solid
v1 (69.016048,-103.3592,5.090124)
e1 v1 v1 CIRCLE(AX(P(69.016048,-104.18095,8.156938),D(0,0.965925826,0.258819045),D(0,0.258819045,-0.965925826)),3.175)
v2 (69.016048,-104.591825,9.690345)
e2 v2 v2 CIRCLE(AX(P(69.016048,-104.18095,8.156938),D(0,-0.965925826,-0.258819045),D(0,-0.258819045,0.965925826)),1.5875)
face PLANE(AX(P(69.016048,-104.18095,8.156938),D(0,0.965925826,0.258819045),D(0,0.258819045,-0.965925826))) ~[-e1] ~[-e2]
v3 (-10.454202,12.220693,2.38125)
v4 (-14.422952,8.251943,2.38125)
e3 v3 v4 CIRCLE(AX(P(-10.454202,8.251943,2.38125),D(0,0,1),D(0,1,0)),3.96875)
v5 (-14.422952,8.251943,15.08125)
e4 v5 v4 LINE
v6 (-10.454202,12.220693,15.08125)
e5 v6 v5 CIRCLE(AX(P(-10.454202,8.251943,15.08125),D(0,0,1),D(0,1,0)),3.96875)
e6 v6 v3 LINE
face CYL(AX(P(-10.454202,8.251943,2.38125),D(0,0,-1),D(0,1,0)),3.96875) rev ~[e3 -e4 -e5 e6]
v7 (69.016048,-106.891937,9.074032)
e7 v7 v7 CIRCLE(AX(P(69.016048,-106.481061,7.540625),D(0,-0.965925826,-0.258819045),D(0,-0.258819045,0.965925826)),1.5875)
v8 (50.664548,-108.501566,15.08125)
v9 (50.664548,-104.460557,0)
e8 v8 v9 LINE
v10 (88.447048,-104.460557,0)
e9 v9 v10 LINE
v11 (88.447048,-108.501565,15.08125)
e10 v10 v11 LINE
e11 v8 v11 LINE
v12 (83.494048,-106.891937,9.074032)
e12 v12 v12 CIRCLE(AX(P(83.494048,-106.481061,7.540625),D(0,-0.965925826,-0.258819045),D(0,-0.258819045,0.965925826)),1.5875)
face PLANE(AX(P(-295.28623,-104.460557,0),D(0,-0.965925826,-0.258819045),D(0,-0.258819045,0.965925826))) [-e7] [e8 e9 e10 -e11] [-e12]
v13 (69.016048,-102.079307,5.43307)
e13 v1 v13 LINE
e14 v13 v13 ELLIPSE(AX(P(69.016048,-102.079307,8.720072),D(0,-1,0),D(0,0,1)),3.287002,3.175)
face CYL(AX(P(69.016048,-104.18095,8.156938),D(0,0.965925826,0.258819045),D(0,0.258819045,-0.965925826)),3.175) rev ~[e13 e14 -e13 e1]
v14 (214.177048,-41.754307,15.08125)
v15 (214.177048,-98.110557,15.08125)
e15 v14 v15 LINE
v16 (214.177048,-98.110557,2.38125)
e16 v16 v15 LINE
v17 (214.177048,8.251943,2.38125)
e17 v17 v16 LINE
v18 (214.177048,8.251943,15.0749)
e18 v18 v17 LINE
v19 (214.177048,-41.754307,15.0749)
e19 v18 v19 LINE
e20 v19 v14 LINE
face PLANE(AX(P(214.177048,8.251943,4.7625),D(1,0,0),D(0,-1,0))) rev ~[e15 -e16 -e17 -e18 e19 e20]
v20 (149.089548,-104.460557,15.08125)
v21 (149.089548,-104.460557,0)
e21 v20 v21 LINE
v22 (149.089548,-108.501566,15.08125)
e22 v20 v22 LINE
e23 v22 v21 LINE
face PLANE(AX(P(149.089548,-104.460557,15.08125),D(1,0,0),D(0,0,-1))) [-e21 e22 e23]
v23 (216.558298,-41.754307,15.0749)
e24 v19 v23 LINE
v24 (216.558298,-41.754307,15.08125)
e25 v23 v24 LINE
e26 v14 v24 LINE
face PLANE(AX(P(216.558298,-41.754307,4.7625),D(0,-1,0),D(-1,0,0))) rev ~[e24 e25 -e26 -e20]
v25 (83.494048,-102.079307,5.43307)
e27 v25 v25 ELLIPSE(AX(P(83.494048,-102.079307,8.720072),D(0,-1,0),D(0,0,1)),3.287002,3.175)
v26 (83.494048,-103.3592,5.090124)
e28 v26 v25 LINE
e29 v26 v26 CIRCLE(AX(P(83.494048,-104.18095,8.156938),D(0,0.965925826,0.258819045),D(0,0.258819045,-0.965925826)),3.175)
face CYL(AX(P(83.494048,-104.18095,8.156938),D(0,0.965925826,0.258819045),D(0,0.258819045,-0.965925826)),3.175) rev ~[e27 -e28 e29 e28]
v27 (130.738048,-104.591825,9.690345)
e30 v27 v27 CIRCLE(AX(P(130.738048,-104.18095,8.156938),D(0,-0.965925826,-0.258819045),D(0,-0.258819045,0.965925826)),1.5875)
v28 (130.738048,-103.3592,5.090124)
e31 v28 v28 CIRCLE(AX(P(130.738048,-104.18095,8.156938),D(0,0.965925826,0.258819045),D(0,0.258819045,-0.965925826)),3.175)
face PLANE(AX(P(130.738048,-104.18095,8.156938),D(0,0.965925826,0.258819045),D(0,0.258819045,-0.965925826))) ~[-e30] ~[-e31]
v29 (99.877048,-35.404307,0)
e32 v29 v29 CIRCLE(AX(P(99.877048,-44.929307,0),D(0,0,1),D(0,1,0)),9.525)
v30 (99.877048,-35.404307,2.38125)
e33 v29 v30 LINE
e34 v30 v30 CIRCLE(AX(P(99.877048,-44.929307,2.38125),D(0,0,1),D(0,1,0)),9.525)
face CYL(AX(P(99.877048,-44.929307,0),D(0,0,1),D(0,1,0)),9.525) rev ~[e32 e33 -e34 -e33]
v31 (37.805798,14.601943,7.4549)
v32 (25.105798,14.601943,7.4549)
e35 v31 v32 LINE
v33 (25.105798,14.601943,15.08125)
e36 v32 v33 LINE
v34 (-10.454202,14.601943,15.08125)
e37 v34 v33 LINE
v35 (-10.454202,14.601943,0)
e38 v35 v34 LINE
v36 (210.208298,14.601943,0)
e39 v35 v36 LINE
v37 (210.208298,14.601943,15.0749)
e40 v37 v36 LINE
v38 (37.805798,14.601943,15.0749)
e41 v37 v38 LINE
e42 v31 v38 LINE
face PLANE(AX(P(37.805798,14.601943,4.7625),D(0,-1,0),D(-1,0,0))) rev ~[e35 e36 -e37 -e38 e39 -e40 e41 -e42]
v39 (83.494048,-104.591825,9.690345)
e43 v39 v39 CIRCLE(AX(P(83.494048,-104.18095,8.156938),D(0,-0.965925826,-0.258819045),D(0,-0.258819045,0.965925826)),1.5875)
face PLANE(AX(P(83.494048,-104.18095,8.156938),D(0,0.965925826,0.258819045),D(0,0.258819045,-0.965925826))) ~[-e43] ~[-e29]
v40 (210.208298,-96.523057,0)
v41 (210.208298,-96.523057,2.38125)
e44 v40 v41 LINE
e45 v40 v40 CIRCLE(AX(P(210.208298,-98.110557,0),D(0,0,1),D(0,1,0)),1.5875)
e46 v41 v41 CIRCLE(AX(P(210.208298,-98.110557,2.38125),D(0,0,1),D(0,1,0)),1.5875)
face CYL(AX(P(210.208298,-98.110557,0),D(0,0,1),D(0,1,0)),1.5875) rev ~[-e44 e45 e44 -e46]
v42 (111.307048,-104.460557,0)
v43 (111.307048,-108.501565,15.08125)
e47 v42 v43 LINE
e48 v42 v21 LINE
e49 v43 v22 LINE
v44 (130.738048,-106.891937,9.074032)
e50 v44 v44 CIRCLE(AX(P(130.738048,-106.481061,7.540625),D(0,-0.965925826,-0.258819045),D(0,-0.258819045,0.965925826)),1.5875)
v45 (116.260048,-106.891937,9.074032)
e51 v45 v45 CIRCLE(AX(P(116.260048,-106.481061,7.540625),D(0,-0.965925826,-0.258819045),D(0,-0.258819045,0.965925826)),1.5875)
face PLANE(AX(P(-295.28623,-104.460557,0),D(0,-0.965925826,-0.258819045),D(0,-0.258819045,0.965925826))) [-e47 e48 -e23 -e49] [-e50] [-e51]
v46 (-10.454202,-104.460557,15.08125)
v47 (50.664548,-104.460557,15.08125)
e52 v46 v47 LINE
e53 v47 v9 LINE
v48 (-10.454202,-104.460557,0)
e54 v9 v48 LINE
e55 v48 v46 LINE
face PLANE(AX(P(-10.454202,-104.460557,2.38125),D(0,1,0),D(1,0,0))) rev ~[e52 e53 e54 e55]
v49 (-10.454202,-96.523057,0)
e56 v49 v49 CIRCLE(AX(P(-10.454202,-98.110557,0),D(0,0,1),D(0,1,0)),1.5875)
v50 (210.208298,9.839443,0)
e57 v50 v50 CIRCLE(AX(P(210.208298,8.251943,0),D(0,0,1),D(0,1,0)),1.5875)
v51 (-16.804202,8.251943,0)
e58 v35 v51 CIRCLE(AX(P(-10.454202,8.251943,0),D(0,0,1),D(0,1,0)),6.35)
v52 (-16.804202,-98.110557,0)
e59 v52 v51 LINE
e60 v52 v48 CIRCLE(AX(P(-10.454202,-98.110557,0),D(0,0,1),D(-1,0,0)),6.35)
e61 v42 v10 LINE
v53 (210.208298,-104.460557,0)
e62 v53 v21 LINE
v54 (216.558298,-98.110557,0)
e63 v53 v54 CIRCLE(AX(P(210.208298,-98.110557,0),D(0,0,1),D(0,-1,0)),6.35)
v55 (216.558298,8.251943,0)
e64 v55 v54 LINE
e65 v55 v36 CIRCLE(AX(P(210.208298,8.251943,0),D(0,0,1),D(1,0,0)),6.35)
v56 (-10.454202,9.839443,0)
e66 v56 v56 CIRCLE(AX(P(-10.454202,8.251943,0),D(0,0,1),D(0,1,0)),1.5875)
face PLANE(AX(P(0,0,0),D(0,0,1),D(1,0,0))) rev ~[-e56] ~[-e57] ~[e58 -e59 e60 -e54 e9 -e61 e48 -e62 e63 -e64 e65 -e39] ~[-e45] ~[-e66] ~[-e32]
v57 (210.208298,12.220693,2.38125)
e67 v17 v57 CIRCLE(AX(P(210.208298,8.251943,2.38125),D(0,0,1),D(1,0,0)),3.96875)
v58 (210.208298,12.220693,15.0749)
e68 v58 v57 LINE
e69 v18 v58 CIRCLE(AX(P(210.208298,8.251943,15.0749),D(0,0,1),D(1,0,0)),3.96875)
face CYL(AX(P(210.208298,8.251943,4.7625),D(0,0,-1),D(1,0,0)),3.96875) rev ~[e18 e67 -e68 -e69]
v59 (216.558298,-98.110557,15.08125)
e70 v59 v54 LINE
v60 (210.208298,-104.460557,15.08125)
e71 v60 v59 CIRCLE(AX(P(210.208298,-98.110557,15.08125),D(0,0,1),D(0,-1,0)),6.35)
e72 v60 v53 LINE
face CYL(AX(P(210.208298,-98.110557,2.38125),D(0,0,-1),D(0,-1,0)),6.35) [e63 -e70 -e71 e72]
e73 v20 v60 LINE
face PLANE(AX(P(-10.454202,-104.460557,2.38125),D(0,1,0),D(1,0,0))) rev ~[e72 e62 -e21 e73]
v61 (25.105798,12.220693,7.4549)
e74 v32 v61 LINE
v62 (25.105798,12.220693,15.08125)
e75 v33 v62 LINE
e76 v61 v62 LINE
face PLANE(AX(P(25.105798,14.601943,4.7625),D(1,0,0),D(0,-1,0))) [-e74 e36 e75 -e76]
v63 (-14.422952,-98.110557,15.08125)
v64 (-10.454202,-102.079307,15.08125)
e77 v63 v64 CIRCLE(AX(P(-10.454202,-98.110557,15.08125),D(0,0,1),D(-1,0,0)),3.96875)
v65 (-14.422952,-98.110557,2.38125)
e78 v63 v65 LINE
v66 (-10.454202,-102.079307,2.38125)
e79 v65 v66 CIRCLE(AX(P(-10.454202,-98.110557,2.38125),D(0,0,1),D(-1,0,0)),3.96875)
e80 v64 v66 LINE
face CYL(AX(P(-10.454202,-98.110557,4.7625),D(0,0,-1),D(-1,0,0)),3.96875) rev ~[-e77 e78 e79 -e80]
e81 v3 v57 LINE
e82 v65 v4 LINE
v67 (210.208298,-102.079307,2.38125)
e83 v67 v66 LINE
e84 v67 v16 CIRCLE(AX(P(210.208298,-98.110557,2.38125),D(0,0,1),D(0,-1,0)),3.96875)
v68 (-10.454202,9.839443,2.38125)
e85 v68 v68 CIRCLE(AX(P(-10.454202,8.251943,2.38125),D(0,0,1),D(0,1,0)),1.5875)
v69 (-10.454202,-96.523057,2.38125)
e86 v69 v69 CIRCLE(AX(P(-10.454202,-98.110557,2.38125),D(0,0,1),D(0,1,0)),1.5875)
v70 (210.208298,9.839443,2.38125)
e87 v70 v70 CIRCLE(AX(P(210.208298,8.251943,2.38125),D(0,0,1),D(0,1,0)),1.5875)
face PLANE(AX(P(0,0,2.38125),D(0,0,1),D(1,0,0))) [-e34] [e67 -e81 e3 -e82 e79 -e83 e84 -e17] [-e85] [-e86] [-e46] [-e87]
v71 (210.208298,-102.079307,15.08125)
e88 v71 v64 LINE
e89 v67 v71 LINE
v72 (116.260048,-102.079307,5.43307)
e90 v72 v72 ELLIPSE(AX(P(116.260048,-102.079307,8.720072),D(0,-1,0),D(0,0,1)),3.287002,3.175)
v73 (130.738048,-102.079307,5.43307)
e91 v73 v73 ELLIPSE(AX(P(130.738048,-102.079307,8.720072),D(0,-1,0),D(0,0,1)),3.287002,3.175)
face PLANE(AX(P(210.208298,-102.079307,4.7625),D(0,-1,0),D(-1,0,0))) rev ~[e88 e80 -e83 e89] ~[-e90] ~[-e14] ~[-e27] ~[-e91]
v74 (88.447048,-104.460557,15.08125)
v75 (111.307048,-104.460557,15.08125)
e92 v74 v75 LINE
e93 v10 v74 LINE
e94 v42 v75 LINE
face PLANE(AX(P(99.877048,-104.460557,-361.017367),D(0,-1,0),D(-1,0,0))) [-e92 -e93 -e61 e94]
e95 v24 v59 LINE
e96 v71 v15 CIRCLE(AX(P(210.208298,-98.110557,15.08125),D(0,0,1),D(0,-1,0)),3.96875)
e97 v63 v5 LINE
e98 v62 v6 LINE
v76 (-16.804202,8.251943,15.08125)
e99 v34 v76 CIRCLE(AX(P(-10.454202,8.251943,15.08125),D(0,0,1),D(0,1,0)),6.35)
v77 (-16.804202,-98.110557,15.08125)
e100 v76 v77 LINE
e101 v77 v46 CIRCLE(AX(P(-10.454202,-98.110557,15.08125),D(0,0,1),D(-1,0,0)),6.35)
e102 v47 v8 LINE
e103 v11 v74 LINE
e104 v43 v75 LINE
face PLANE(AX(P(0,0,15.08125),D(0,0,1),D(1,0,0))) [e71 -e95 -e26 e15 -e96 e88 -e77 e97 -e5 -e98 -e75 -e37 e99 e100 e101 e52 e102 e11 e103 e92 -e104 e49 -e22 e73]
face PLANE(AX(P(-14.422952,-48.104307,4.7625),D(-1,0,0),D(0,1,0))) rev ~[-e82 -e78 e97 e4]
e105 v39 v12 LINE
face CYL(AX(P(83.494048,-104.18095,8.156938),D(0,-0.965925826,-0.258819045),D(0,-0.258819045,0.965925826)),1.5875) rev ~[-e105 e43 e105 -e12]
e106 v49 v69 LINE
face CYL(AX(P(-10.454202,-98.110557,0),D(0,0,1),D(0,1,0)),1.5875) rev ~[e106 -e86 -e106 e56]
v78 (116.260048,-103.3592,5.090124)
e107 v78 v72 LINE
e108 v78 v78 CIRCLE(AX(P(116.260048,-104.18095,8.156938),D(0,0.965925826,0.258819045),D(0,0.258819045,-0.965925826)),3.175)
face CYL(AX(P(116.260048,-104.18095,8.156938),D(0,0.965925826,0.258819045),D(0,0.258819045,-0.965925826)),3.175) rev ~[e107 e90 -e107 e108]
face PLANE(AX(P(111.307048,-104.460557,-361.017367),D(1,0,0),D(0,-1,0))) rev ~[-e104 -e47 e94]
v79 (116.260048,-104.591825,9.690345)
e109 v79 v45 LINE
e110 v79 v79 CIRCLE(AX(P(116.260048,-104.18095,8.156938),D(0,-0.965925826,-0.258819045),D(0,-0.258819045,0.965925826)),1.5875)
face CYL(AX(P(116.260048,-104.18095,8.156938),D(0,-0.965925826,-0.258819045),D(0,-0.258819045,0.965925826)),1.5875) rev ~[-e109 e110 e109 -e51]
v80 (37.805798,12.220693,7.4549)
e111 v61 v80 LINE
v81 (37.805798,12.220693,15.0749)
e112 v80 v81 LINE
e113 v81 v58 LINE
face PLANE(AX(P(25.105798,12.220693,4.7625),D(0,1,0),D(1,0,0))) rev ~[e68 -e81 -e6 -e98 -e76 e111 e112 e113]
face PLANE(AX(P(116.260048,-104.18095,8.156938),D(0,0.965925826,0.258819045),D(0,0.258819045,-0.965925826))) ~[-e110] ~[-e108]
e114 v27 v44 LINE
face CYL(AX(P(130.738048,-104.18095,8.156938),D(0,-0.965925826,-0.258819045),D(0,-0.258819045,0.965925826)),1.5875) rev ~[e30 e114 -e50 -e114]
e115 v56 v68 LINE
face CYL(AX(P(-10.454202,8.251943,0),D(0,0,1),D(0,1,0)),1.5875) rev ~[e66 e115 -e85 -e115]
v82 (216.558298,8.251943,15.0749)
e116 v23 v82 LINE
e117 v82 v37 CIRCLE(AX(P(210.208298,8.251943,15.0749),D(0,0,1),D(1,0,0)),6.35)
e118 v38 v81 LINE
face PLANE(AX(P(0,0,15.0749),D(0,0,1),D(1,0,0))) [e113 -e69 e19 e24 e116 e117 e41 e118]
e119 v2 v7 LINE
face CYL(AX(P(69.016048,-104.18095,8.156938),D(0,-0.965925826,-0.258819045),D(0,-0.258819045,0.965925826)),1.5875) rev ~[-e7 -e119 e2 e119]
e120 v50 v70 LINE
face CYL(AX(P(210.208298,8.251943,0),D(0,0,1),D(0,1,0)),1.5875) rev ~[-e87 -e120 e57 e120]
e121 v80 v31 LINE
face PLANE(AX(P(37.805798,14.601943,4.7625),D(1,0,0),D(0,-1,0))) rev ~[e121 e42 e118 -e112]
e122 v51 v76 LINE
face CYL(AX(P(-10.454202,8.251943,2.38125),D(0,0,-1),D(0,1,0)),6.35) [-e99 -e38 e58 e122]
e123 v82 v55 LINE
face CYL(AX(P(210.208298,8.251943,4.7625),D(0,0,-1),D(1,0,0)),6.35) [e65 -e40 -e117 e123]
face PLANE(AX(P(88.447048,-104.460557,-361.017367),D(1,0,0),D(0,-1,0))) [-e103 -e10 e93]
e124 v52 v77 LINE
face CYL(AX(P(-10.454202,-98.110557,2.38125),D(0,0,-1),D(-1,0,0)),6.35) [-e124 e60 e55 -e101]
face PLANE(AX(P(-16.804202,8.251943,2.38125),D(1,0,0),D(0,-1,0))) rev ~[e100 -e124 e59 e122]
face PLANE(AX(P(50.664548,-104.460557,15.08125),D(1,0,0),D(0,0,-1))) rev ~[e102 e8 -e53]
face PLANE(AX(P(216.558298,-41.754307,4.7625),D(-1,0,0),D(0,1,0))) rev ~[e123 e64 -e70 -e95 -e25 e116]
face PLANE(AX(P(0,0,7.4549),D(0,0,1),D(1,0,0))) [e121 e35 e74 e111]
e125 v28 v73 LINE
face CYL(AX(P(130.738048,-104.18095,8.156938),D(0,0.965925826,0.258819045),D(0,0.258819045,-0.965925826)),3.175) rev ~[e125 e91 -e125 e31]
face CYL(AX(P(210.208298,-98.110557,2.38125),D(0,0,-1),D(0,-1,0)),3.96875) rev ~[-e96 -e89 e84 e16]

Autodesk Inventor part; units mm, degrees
ref_plane "YZ Plane" through (0, 0, 0) normal (1, 0, 0) x (0, 1, 0)
ref_plane "XZ Plane" through (0, 0, 0) normal (0, 1, 0) x (-1, 0, 0)
sketch "Sketch1" plane through (0, 0, 0) normal (0, 0, 1) x (1, 0, 0)
  line L0 (-10.454202, 14.601943) -> (210.208298, 14.601943)
  line L1 (216.558298, 8.251943) -> (216.558298, -98.110557)
  line L2 (210.208298, -104.460557) -> (-10.454202, -104.460557)
  line L3 (-16.804202, -98.110557) -> (-16.804202, 8.251943)
  line L4 (99.877048, 12.220693) -> (-10.454202, 12.220693)
  line L5 (-14.422952, 8.251943) -> (-14.422952, -44.929307)
  line L6 (99.877048, 12.220693) -> (210.208298, 12.220693)
  line L7 (214.177048, 8.251943) -> (214.177048, -44.929307)
  line L8 (99.877048, -102.079307) -> (210.208298, -102.079307)
  line L9 (214.177048, -98.110557) -> (214.177048, -44.929307)
  line L10 (99.877048, -102.079307) -> (-10.454202, -102.079307)
  line L11 (-14.422952, -98.110557) -> (-14.422952, -44.929307)
  arc A0 (-10.454202, 14.601943) -> (-16.804202, 8.251943) centre (-10.454202, 8.251943) ccw
  arc A1 (216.558298, 8.251943) -> (210.208298, 14.601943) centre (210.208298, 8.251943) ccw
  arc A2 (210.208298, -104.460557) -> (216.558298, -98.110557) centre (210.208298, -98.110557) ccw
  arc A3 (-16.804202, -98.110557) -> (-10.454202, -104.460557) centre (-10.454202, -98.110557) ccw
  arc A4 (-10.454202, 12.220693) -> (-14.422952, 8.251943) centre (-10.454202, 8.251943) ccw
  arc A5 (214.177048, 8.251943) -> (210.208298, 12.220693) centre (210.208298, 8.251943) ccw
  arc A6 (210.208298, -102.079307) -> (214.177048, -98.110557) centre (210.208298, -98.110557) ccw
  arc A7 (-14.422952, -98.110557) -> (-10.454202, -102.079307) centre (-10.454202, -98.110557) ccw
  point P0 (0, 0)
  point P1 (-16.804202, 14.601943)
  point P2 (216.558298, -104.460557)
  point P3 (216.558298, 14.601943)
  point P4 (-16.804202, -104.460557)
  dimension "d0" = 233.3625
  dimension "d1" = 119.0625
  dimension "d9" = 6.35
  dimension "d10" = 3.96875
extrude "Extrusion1" add sketch "Sketch1" along normal blind 2.38125 contours L0 A1 L1 A2 L2 A3 L3 A0 | L6 A5 L7 L9 A6 L8 L10 A7 L11 L5 A4 L4
sketch "Sketch2" plane through (0, 0, 2.38125) normal (0, 0, 1) x (1, 0, 0)
  line L0 (210.208298, 14.601943) -> (-10.454202, 14.601943)
  arc A0 (-10.454202, 14.601943) -> (-16.804202, 8.251943) centre (-10.454202, 8.251943) ccw
  line L1 (-16.804202, 8.251943) -> (-16.804202, -98.110557)
  arc A1 (-16.804202, -98.110557) -> (-10.454202, -104.460557) centre (-10.454202, -98.110557) ccw
  line L2 (-10.454202, -104.460557) -> (210.208298, -104.460557)
  arc A2 (210.208298, -104.460557) -> (216.558298, -98.110557) centre (210.208298, -98.110557) ccw
  line L3 (216.558298, -98.110557) -> (216.558298, 8.251943)
  arc A3 (216.558298, 8.251943) -> (210.208298, 14.601943) centre (210.208298, 8.251943) ccw
  line L4 (99.877048, 12.220693) -> (-10.454202, 12.220693)
  line L5 (-14.422952, 8.251943) -> (-14.422952, -44.929307)
  line L6 (99.877048, -102.079307) -> (-10.454202, -102.079307)
  line L7 (-14.422952, -98.110557) -> (-14.422952, -44.929307)
  line L8 (99.877048, -102.079307) -> (210.208298, -102.079307)
  line L9 (214.177048, -98.110557) -> (214.177048, -44.929307)
  line L10 (99.877048, 12.220693) -> (210.208298, 12.220693)
  line L11 (214.177048, 8.251943) -> (214.177048, -44.929307)
  arc A4 (-10.454202, 12.220693) -> (-14.422952, 8.251943) centre (-10.454202, 8.251943) ccw
  arc A5 (214.177048, 8.251943) -> (210.208298, 12.220693) centre (210.208298, 8.251943) ccw
  arc A6 (210.208298, -102.079307) -> (214.177048, -98.110557) centre (210.208298, -98.110557) ccw
  arc A7 (-14.422952, -98.110557) -> (-10.454202, -102.079307) centre (-10.454202, -98.110557) ccw
  point P0 (0, 0)
  dimension "d15" = 3.96875
extrude "Extrusion2" add sketch "Sketch2" along normal blind 2.38125
sketch "Sketch3" plane through (0, 0, 4.7625) normal (0, 0, 1) x (1, 0, 0)
  arc A0 (-10.454202, 12.220693) -> (-14.422952, 8.251943) centre (-10.454202, 8.251943) ccw
  arc A1 (214.177048, 8.251943) -> (210.208298, 12.220693) centre (210.208298, 8.251943) ccw
  line L0 (214.177048, 8.251943) -> (214.177048, -98.110557)
  arc A2 (210.208298, -102.079307) -> (214.177048, -98.110557) centre (210.208298, -98.110557) ccw
  line L1 (210.208298, -102.079307) -> (-10.454202, -102.079307)
  arc A3 (-14.422952, -98.110557) -> (-10.454202, -102.079307) centre (-10.454202, -98.110557) ccw
  line L2 (-14.422952, -98.110557) -> (-14.422952, 8.251943)
  arc A4 (-10.454202, 14.601943) -> (-16.804202, 8.251943) centre (-10.454202, 8.251943) ccw
  line L3 (-16.804202, 8.251943) -> (-16.804202, -98.110557)
  arc A5 (-16.804202, -98.110557) -> (-10.454202, -104.460557) centre (-10.454202, -98.110557) ccw
  line L4 (-10.454202, -104.460557) -> (210.208298, -104.460557)
  arc A6 (210.208298, -104.460557) -> (216.558298, -98.110557) centre (210.208298, -98.110557) ccw
  line L5 (216.558298, -98.110557) -> (216.558298, 8.251943)
  arc A7 (216.558298, 8.251943) -> (210.208298, 14.601943) centre (210.208298, 8.251943) ccw
  line L6 (214.177048, -44.929307) -> (214.177048, -41.754307)
  line L7 (214.177048, -41.754307) -> (216.558298, -41.754307)
  line L8 (216.558298, -41.754307) -> (216.558298, -44.929307)
  line L9 (216.558298, -44.929307) -> (216.558298, -48.104307)
  line L10 (216.558298, -48.104307) -> (214.177048, -48.104307)
  line L11 (214.177048, -48.104307) -> (214.177048, -44.929307)
  line L12 (-14.422952, -44.929307) -> (-14.422952, -41.754307)
  line L13 (-14.422952, -41.754307) -> (-16.804202, -41.754307)
  line L14 (-16.804202, -41.754307) -> (-16.804202, -44.929307)
  line L15 (-16.804202, -44.929307) -> (-16.804202, -48.104307)
  line L16 (-16.804202, -48.104307) -> (-14.422952, -48.104307)
  line L17 (-14.422952, -48.104307) -> (-14.422952, -44.929307)
  line L18 (25.105798, 14.601943) -> (25.105798, 12.220693)
  line L19 (37.805798, 14.601943) -> (37.805798, 12.220693)
  line L20 (-10.454202, 14.601943) -> (25.105798, 14.601943)
  line L21 (25.105798, 12.220693) -> (-10.454202, 12.220693)
  line L22 (37.805798, 12.220693) -> (210.208298, 12.220693)
  line L23 (210.208298, 14.601943) -> (37.805798, 14.601943)
  point P0 (0, 0)
  dimension "d18" = 3.175
  dimension "d19" = 3.175
  dimension "d20" = 3.175
  dimension "d21" = 3.175
  dimension "d78" = 35.56
  dimension "d79" = 12.7
extrude "Extrusion3" add sketch "Sketch3" along normal blind 10.31875 contours A0 L2 L13 L3 A4 L20 L18 L21 | L2 A3 L1 A2 L0 L10 L5 A6 L4 A5 L3 L16
sketch "Sketch4" plane through (0, 0, 15.08125) normal (0, 0, 1) x (1, 0, 0)
  line L0 (214.177048, -41.754307) -> (216.558298, -41.754307)
  line L1 (216.558298, -41.754307) -> (216.558298, -48.104307)
  line L2 (216.558298, -48.104307) -> (214.177048, -48.104307)
  line L3 (214.177048, -48.104307) -> (214.177048, -41.754307)
  line L4 (-16.804202, -41.754307) -> (-14.422952, -41.754307)
  line L5 (-14.422952, -41.754307) -> (-14.422952, -48.104307)
  line L6 (-14.422952, -48.104307) -> (-16.804202, -48.104307)
  line L7 (-16.804202, -48.104307) -> (-16.804202, -41.754307)
  point P0 (0, 0)
  dimension "d24" = 2.38125
  dimension "d25" = 6.35
  dimension "d26" = 2.38125
  dimension "d27" = 6.35
extrude "Extrusion4" add sketch "Sketch4" against normal blind 7.9375
sketch "Sketch5" plane through (0, 0, 0) normal (0, 0, -1) x (-1, 0, 0)
  arc A0 (-210.208298, 14.601943) -> (-216.558298, 8.251943) centre (-210.208298, 8.251943) ccw
  line L0 (-210.208298, 8.251943) -> (-99.877048, 8.251943)
  line L1 (-99.877048, 8.251943) -> (-99.877048, -44.929307)
  line L2 (-99.877048, -44.929307) -> (-210.208298, -44.929307)
  line L3 (-210.208298, -44.929307) -> (-210.208298, 8.251943)
  point P0 (0, 0)
hole "Hole1" at (99.877048, -44.929307, 0) direction (0, 0, 1) diameter 19.05 end through all
sketch "Sketch7" plane through (-10.454202, -104.460557, 0) normal (0, -1, 0) x (1, 0, 0)
  line L0 (220.6625, 0) -> (0, 0)
  line L1 (0, 15.08125) -> (220.6625, 15.08125)
  line L2 (61.11875, 15.08125) -> (61.11875, 0)
  line L3 (159.54375, 15.08125) -> (159.54375, 0)
  line L4 (61.11875, 15.08125) -> (159.54375, 15.08125)
  line L5 (159.54375, 0) -> (61.11875, 0)
  point P0 (10.454202, 0)
extrude "Extrusion5" add sketch "Sketch7" along normal blind 25.4
sketch "Sketch8" plane through (149.089548, -104.460557, 15.08125) normal (1, 0, 0) x (0, 0, -1)
  line L0 (15.08125, 0) -> (-19.502452, -9.266675)
  line L1 (15.08125, 0) -> (50.884933, 0) construction
  point P0 (15.08125, 104.460557)
  dimension "d41" = 165
split body "Split1" sketch "Sketch8" result one side removed curves L0 removed pieces at (116.281215, -121.39389, 0.5)
ref_plane "Work Plane1" through (50.664548, -102.160446, 0.616313) normal (0, -0.9659258, -0.258819) x (1, 0, 0)
sketch "Sketch10" plane through (0, 0, 15.08125) normal (0, 0, 1) x (1, 0, 0)
  line L0 (99.877048, -104.460557) -> (111.307048, -104.460557)
  line L1 (111.307048, -104.460557) -> (111.307048, -108.501565)
  line L2 (99.877048, -104.460557) -> (88.447048, -104.460557)
  line L3 (88.447048, -104.460557) -> (88.447048, -108.501565)
  line L4 (88.447048, -108.501565) -> (111.307048, -108.501565)
  point P0 (0, 0)
  dimension "d43" = 11.43
  dimension "d44" = 11.43
split body "Split2" sketch "Sketch10" result one side removed curves L4 L1 L0 L2 L3 removed pieces at (99.877048, -106.671599, 10.183576)
sketch "Sketch13" plane through (50.664548, -102.160446, 0.616313) normal (0, -0.9659258, -0.258819) x (1, 0, 0)
  line L0 (37.7825, 0) -> (37.7825, 15.613259)
  line L1 (0, 15.613259) -> (37.7825, 15.613259)
  line L2 (0, 0) -> (0, 15.613259)
  line L3 (37.7825, 0) -> (0, 0)
  line L4 (60.6425, 15.613259) -> (60.6425, 0)
  line L5 (98.425, 0) -> (60.6425, 0)
  line L6 (98.425, 15.613259) -> (98.425, 0)
  line L7 (60.6425, 15.613259) -> (98.425, 15.613259)
  line L8 (0, 15.613259) -> (98.425, 15.613259)
  line L9 (49.2125, 15.613259) -> (49.2125, 0)
  line L10 (49.2125, 7.806629) -> (32.8295, 7.806629)
  line L11 (49.2125, 7.806629) -> (65.5955, 7.806629)
  line L12 (65.5955, 7.806629) -> (80.0735, 7.806629)
  line L13 (32.8295, 7.806629) -> (18.3515, 7.806629)
  point P0 (-50.664548, -27.036381)
  dimension "d45" = 16.383
  dimension "d46" = 16.383
  dimension "d47" = 14.478
  dimension "d48" = 14.478
hole "Hole2" at (69.016048, -104.18095, 8.156938) at (116.260048, -104.18095, 8.156938) at (83.494048, -104.18095, 8.156938) at (130.738048, -104.18095, 8.156938) direction (0, 0.9659258, 0.258819) diameter 6.35 end through all
sketch "Sketch14" plane through (50.664548, -102.160446, 0.616313) normal (0, -0.9659258, -0.258819) x (1, 0, 0)
  line L0 (37.7825, 0) -> (37.7825, 15.613259)
  line L1 (0, 15.613259) -> (37.7825, 15.613259)
  line L2 (0, 0) -> (0, 15.613259)
  line L3 (37.7825, 0) -> (0, 0)
  line L4 (60.6425, 15.613259) -> (60.6425, 0)
  line L5 (98.425, 0) -> (60.6425, 0)
  line L6 (98.425, 15.613259) -> (98.425, 0)
  line L7 (60.6425, 15.613259) -> (98.425, 15.613259)
  line L8 (0, 15.613259) -> (98.425, 15.613259)
  line L9 (49.2125, 15.613259) -> (49.2125, 0)
  line L10 (49.2125, 7.806629) -> (65.5955, 7.806629)
  line L11 (65.5955, 7.806629) -> (80.0735, 7.806629)
  line L12 (49.2125, 7.806629) -> (32.8295, 7.806629)
  line L13 (32.8295, 7.806629) -> (18.3515, 7.806629)
  point P0 (-50.664548, -27.036381)
  dimension "d56" = 16.383
  dimension "d57" = 14.478
  dimension "d58" = 16.383
  dimension "d59" = 14.478
hole "Hole3" at (69.016048, -104.18095, 8.156938) at (83.494048, -104.18095, 8.156938) at (116.260048, -104.18095, 8.156938) at (130.738048, -104.18095, 8.156938) direction (0, -0.9659258, -0.258819) diameter 3.175 end through all
sketch "Sketch15" plane through (0, 0, 4.7625) normal (0, 0, 1) x (1, 0, 0)
  line L0 (216.558298, -41.754307) -> (214.177048, -41.754307)
  line L1 (214.177048, 8.251943) -> (214.177048, -48.104307)
  line L2 (216.558298, -41.754307) -> (214.177048, -41.754307)
  line L3 (214.177048, -41.754307) -> (214.177048, -48.104307)
  line L4 (214.177048, -48.104307) -> (216.558298, -48.104307)
  line L5 (216.558298, -48.104307) -> (216.558298, -41.754307)
  point P0 (0, 0)
extrude "Extrusion6" add sketch "Sketch15" along normal blind 2.3876
sketch "Sketch16" plane through (0, 0, 4.7625) normal (0, 0, 1) x (1, 0, 0)
  line L0 (-14.422952, -41.754307) -> (-16.804202, -41.754307)
  line L1 (-16.804202, -41.754307) -> (-16.804202, -48.104307)
  line L2 (-14.422952, -41.754307) -> (-16.804202, -41.754307)
  line L3 (-16.804202, -41.754307) -> (-16.804202, -48.104307)
  line L4 (-16.804202, -48.104307) -> (-14.422952, -48.104307)
  line L5 (-14.422952, -48.104307) -> (-14.422952, -41.754307)
  point P0 (0, 0)
extrude "Extrusion7" add sketch "Sketch16" along normal blind 2.3876
sketch "Sketch17" plane through (0, 0, 0) normal (0, 0, -1) x (-1, 0, 0)
  arc A0 (10.454202, -104.460557) -> (16.804202, -98.110557) centre (10.454202, -98.110557) ccw
  arc A1 (16.804202, 8.251943) -> (10.454202, 14.601943) centre (10.454202, 8.251943) ccw
  arc A2 (-210.208298, 14.601943) -> (-216.558298, 8.251943) centre (-210.208298, 8.251943) ccw
  arc A3 (-216.558298, -98.110557) -> (-210.208298, -104.460557) centre (-210.208298, -98.110557) ccw
  point P0 (0, 0)
hole "Hole4" at (210.208298, 8.251943, 0) at (-10.454202, 8.251943, 0) at (-10.454202, -98.110557, 0) at (210.208298, -98.110557, 0) direction (0, 0, 1) diameter 3.175 end through all
sketch "Sketch18" plane through (0, 0, 4.7625) normal (0, 0, 1) x (1, 0, 0)
  line L0 (214.177048, -41.754307) -> (216.558298, -41.754307)
  line L1 (216.558298, -41.754307) -> (216.558298, 8.251943)
  arc A0 (216.558298, 8.251943) -> (210.208298, 14.601943) centre (210.208298, 8.251943) ccw
  line L2 (210.208298, 14.601943) -> (25.105798, 14.601943)
  line L3 (25.105798, 12.220693) -> (210.208298, 12.220693)
  arc A1 (214.177048, 8.251943) -> (210.208298, 12.220693) centre (210.208298, 8.251943) ccw
  line L4 (214.177048, 8.251943) -> (214.177048, -41.754307)
  line L5 (25.105798, 14.601943) -> (37.805798, 14.601943)
  line L6 (37.805798, 14.601943) -> (37.805798, 12.220693)
  point P0 (0, 0)
  dimension "d80" = 12.7
extrude "Extrusion8" add sketch "Sketch18" along normal blind 10.3124
sketch "Sketch19" plane through (0, 0, 4.7625) normal (0, 0, 1) x (1, 0, 0)
  line L0 (37.805798, 12.220693) -> (37.805798, 14.601943)
  line L1 (37.805798, 14.601943) -> (25.105798, 14.601943)
  line L2 (25.105798, 14.601943) -> (25.105798, 12.220693)
  line L3 (25.105798, 12.220693) -> (37.805798, 12.220693)
  point P0 (0, 0)
extrude "Extrusion9" add sketch "Sketch19" along normal blind 2.6924
properties part number "Master Tablet Enclosure"
